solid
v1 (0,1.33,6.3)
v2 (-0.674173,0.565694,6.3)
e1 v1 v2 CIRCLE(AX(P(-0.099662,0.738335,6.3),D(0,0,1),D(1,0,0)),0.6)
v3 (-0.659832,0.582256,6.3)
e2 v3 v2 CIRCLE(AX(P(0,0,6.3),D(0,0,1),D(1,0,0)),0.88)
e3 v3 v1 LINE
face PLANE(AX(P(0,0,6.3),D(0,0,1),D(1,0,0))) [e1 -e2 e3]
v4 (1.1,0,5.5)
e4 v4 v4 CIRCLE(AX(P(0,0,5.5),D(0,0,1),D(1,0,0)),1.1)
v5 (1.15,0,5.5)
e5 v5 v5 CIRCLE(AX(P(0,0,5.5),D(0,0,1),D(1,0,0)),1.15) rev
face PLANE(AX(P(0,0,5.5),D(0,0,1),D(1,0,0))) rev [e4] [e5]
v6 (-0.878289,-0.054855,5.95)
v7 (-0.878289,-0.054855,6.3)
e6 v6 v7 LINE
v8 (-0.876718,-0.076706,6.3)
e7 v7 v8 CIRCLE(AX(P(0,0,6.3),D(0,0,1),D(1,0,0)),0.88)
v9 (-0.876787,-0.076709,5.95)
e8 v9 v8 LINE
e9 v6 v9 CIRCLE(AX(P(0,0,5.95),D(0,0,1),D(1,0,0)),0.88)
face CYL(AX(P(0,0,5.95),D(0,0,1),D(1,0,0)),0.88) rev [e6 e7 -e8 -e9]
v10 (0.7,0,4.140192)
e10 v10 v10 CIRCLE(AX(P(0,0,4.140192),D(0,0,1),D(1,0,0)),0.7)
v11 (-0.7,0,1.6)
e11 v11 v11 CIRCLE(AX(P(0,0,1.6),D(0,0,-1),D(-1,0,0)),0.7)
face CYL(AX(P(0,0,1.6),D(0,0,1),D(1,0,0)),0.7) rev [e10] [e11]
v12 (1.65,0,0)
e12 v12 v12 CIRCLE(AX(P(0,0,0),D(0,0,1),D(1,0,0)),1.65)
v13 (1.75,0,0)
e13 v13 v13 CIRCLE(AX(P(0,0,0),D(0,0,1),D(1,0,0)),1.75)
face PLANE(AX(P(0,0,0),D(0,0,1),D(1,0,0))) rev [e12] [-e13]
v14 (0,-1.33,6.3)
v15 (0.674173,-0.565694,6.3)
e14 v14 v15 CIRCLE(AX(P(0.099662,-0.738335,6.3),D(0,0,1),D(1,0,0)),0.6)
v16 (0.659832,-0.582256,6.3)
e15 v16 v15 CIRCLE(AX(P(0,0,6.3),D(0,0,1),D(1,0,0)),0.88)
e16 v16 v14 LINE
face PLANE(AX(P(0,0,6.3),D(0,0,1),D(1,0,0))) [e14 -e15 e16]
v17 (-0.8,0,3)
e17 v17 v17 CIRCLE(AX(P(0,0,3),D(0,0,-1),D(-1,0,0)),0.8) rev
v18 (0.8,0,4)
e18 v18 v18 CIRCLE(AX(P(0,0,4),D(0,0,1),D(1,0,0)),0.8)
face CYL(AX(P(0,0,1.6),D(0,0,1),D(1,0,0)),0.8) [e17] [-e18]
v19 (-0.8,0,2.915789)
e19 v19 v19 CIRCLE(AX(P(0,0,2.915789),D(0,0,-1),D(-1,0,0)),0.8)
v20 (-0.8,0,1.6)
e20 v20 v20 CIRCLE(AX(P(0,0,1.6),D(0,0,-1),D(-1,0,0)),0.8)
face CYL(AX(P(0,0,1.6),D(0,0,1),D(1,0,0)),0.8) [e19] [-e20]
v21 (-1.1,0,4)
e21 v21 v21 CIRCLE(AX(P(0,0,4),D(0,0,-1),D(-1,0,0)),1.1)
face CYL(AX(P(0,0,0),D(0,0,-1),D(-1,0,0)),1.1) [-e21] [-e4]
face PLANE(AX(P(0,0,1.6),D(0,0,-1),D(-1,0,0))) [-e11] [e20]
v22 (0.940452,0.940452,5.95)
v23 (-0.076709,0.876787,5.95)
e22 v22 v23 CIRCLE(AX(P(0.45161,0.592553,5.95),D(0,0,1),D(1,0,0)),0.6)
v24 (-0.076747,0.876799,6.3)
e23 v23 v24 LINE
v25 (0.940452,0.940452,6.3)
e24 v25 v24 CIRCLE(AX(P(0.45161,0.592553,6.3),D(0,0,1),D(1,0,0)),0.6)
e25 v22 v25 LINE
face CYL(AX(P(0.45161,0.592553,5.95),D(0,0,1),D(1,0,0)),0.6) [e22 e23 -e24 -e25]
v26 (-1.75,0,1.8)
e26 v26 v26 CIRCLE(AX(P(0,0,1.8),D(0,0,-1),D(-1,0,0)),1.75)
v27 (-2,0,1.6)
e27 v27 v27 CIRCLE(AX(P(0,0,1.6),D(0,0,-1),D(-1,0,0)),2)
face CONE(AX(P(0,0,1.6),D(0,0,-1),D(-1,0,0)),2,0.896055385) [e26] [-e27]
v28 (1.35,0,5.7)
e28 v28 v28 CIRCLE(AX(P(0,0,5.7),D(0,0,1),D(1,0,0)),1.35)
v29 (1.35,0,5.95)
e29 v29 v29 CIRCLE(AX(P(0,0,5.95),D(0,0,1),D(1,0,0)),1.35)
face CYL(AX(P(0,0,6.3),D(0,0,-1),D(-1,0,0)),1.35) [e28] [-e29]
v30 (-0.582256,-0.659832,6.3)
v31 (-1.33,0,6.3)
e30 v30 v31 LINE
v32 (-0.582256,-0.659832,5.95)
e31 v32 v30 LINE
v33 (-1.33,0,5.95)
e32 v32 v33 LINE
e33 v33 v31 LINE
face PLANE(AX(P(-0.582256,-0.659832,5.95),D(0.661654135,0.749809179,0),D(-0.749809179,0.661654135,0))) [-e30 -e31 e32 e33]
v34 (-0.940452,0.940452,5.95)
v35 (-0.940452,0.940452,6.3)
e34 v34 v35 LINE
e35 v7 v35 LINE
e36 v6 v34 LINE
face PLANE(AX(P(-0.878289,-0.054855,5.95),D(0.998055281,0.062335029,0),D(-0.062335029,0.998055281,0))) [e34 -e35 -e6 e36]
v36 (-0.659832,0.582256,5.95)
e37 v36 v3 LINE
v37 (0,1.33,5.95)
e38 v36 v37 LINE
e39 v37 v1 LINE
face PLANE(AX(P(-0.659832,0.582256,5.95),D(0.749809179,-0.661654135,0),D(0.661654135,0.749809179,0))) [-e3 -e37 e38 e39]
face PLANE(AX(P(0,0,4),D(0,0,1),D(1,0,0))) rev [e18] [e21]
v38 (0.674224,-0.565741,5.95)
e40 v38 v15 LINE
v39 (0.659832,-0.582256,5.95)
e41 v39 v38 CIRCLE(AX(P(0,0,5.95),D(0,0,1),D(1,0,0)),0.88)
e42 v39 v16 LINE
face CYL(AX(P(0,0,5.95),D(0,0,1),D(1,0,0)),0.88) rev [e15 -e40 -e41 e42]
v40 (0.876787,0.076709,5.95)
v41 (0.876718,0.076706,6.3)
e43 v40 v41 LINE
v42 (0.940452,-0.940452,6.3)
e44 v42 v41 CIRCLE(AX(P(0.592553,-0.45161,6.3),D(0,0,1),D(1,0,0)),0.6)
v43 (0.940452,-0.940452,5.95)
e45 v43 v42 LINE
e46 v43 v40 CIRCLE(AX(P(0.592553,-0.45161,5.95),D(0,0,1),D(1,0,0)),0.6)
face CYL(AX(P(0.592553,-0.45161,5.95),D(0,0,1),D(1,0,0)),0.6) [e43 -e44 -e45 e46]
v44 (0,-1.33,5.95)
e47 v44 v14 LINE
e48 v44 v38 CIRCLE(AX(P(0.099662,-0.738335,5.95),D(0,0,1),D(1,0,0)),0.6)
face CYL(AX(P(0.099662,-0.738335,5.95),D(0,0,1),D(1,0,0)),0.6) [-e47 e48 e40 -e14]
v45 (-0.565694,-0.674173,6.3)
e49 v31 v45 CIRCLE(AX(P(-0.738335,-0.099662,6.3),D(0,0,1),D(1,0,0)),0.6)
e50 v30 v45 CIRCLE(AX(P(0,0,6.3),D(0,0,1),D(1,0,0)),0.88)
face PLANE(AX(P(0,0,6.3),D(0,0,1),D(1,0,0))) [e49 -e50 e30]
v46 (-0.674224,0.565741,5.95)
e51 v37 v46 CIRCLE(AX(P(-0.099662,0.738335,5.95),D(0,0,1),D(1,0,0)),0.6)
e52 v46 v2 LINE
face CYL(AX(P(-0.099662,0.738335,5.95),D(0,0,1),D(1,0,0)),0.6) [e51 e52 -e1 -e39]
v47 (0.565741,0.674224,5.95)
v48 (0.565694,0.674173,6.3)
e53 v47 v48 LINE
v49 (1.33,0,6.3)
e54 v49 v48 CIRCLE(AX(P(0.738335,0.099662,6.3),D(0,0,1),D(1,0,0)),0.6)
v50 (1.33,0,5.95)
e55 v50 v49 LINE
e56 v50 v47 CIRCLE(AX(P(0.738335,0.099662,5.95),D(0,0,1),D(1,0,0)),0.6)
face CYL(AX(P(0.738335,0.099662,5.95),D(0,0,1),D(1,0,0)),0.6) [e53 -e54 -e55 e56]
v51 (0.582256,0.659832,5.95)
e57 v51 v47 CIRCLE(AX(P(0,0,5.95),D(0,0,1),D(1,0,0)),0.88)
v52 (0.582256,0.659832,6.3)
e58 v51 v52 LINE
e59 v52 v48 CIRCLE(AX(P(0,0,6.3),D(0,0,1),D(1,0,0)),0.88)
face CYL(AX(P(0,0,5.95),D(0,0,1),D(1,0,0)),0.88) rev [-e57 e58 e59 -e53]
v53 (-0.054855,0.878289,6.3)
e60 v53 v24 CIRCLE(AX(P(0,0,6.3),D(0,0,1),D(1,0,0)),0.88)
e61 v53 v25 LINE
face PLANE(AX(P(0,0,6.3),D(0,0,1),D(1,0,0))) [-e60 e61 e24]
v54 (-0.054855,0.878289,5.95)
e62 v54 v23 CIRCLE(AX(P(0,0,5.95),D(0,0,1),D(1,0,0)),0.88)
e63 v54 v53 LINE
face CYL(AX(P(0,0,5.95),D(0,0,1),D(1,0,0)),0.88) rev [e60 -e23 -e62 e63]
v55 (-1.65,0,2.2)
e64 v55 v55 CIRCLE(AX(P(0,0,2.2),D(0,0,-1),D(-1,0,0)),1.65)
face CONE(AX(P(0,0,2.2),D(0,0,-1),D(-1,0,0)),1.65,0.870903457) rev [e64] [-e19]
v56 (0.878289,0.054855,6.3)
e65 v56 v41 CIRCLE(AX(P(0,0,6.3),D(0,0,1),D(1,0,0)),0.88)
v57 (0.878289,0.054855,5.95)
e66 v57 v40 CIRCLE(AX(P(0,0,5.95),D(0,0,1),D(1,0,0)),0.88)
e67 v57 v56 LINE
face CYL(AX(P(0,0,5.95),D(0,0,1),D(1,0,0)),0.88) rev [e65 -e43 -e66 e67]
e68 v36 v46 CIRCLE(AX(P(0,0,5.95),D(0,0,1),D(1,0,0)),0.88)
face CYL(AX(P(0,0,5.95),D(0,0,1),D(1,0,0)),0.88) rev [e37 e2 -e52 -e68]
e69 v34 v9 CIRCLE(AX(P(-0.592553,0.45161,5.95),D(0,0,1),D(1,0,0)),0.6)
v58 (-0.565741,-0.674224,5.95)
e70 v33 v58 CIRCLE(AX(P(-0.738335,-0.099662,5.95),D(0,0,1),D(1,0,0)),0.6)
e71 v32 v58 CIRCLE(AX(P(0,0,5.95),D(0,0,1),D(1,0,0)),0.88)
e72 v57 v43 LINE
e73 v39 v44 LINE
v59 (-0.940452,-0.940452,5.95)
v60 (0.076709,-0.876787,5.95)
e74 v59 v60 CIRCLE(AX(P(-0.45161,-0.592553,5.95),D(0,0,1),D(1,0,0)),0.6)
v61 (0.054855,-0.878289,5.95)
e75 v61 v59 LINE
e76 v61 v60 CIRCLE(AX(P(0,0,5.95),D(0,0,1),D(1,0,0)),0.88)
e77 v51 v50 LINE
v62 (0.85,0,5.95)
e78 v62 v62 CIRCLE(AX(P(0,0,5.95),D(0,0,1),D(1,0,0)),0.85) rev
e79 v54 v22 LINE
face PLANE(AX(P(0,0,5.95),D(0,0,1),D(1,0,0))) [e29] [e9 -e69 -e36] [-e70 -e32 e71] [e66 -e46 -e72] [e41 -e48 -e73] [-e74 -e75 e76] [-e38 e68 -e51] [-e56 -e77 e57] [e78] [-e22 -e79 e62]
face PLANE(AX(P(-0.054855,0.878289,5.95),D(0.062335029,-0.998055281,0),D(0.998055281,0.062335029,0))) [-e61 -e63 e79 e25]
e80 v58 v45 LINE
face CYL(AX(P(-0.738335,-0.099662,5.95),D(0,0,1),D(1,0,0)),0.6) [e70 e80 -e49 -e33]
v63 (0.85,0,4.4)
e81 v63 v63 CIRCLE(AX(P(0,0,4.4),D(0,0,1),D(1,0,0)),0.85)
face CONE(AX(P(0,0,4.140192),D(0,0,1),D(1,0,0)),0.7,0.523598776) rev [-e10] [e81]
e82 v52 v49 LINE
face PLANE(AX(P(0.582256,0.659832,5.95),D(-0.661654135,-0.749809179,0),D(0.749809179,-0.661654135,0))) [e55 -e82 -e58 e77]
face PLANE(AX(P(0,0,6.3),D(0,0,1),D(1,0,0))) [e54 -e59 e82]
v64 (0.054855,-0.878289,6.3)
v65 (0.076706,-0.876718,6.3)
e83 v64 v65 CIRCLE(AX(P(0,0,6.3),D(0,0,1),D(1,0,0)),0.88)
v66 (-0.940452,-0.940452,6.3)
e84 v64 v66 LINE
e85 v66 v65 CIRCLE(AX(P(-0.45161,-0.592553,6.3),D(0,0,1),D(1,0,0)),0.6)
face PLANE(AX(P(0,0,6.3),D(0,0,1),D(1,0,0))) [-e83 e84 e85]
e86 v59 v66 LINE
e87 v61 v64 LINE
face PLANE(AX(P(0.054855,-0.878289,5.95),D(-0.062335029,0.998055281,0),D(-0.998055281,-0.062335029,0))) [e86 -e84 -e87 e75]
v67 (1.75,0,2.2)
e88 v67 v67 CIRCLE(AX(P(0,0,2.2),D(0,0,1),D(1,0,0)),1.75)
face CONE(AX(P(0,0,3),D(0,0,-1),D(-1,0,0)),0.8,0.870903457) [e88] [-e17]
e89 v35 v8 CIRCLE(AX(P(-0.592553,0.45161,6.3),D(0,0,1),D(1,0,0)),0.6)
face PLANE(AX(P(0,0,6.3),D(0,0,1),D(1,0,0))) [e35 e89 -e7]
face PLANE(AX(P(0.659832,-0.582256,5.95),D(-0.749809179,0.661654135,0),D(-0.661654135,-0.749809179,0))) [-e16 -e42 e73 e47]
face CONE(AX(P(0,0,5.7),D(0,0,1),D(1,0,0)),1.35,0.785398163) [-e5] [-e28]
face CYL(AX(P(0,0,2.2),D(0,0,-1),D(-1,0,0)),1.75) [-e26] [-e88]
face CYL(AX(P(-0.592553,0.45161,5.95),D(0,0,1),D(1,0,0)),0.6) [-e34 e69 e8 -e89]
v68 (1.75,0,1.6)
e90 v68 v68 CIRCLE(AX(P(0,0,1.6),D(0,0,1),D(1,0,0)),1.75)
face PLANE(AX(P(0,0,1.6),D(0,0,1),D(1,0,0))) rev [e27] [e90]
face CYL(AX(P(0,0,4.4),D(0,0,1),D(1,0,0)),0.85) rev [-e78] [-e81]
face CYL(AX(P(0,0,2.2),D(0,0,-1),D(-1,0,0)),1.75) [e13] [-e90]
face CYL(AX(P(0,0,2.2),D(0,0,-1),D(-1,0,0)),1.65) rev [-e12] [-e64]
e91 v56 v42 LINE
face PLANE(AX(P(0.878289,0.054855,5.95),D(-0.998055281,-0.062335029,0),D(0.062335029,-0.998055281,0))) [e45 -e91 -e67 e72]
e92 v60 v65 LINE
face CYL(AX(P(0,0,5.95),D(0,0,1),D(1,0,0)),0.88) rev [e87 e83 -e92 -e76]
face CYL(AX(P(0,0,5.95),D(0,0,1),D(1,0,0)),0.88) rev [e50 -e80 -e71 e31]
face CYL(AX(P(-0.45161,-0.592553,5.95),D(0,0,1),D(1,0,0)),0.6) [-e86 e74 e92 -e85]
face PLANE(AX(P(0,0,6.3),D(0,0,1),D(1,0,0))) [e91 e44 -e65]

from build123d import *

# Parameters (mm, degrees)
SKETCH_1_R          = 1.75
SKETCH_1_R_2        = 1.65
EXTRUDE_1_DEPTH     = 2.2
SKETCH_10_R         = 0.8
SKETCH_10_R_2       = 0.7
EXTRUDE_2_DEPTH     = 1.2
SKETCH_11_R         = 0.8
SKETCH_11_R_2       = 0.7
EXTRUDE_4_DEPTH     = 0.9
SKETCH_12_W         = 0.3
SKETCH_12_H         = 0.9
SKETCH_13_R         = 0.85
CUT_EXTRUDE_2_DEPTH = 0.5
CHAMFER_1_SIZE      = 0.15
CHAMFER_1_SIZE_2    = 0.259807621
SKETCH_14_R         = 1.1
SKETCH_14_R_2       = 0.85
EXTRUDE_5_DEPTH     = 0.6
SKETCH_15_R         = 1.35
SKETCH_15_R_2       = 1.1
EXTRUDE_6_DEPTH     = 0.8
SKETCH_17_R         = 1.1
SKETCH_17_R_2       = 0.85
EXTRUDE_7_DEPTH     = 0.8
CHAMFER_3_SIZE      = 0.2
CUT_EXTRUDE_START   = -0.35
SKETCH_20_R         = 1.35
SKETCH_20_R_2       = 0.85
CUT_EXTRUDE_4_DEPTH = 0.35


with BuildPart() as part:
    # 스케치1 → 보스-돌출1 (new body)
    with BuildSketch(Plane.XY):
        Circle(SKETCH_1_R)
        Circle(SKETCH_1_R_2, mode=Mode.SUBTRACT)
    extrude(amount=EXTRUDE_1_DEPTH)

    # 스케치2 → 회전1 (revolve)
    with BuildSketch(Plane(origin=(0, 0, 0), x_dir=(1, 0, 0), z_dir=(0, 1, 0)), mode=Mode.PRIVATE) as revolve_1_sk:
        Polygon((2, -1.6), (1.75, -1.8), (1.75, -1.6), align=None)
    revolve(revolve_1_sk.sketch.rotate(Axis((0, 0, 0), (0, 0, 1)), 180), axis=Axis((0, 0, 0), (0, 0, 1)))

    # 스케치3 → 회전2 (revolve)
    with BuildSketch(Plane(origin=(0, 0, 0), x_dir=(1, 0, 0), z_dir=(0, 1, 0)), mode=Mode.PRIVATE) as revolve_2_sk:
        Polygon((0.8, -3), (1.75, -2.2), (1.65, -2.2), (0.8, -2.915789474), align=None)
    revolve(revolve_2_sk.sketch.rotate(Axis((0, 0, 0), (0, 0, 1)), 180), axis=Axis((0, 0, 0), (0, 0, 1)))

    # 스케치10 → 보스-돌출2 (add, symmetric)
    with BuildSketch(Plane(origin=(0, 0, 2.8), x_dir=(-1, 0, 0), z_dir=(0, 0, -1))):
        Circle(SKETCH_10_R)
        Circle(SKETCH_10_R_2, mode=Mode.SUBTRACT)
    extrude(amount=EXTRUDE_2_DEPTH, both=True)

    # 스케치11 → 보스-돌출4 (add)
    with BuildSketch(Plane.XY.offset(4)):
        with Locations(Location((0, 0, 0), (0, 0, 180))):
            Circle(SKETCH_11_R)
        Circle(SKETCH_11_R_2, mode=Mode.SUBTRACT)
    extrude(amount=EXTRUDE_4_DEPTH)

    # 스케치12 → 회전3 (revolve)
    with BuildSketch(Plane(origin=(0, 0, 0), x_dir=(1, 0, 0), z_dir=(0, 1, 0)), mode=Mode.PRIVATE) as revolve_3_sk:
        with Locations((0.95, -4.45)):
            Rectangle(SKETCH_12_W, SKETCH_12_H)
    revolve(revolve_3_sk.sketch.rotate(Axis((0, 0, 0), (0, 0, 1)), 180), axis=Axis((0, 0, 0), (0, 0, 1)))

    # 스케치13 → 컷-돌출2 (cut)
    with BuildSketch(Plane.XY.offset(4.9)):
        Circle(SKETCH_13_R)
    extrude(amount=-CUT_EXTRUDE_2_DEPTH, mode=Mode.SUBTRACT)

    # 모따기1
    # the kernel refuses this chamfer: 0.259807621, 0.15 mm, written as the material it takes off along each edge
    with BuildSketch(Plane(origin=(0, 0, 4.4), x_dir=(1, 0, 0), z_dir=(0, 1, 0))) as chamfer_1_piece_1_section:
        Polygon((0.7 + CHAMFER_1_SIZE, 0), (0.7, CHAMFER_1_SIZE_2), (0.7, 0), align=None)
    chamfer_1_piece_1 = revolve(axis=Axis((0, 0, 4.4), (0, 0, -1)), mode=Mode.PRIVATE)
    chamfer_1_piece_1 = chamfer_1_piece_1 & Plane(origin=(0, 0, 4.267945413), x_dir=(1, 0, 0), z_dir=(0, 0, 1)) * Cylinder(0.85, 4, mode=Mode.PRIVATE)
    add(chamfer_1_piece_1, mode=Mode.SUBTRACT)

    # 스케치14 → 보스-돌출5 (add)
    with BuildSketch(Plane.XY.offset(4.9)):
        with Locations(Location((0, 0, 0), (0, 0, 180))):
            Circle(SKETCH_14_R)
        Circle(SKETCH_14_R_2, mode=Mode.SUBTRACT)
    extrude(amount=EXTRUDE_5_DEPTH)



with BuildPart() as body_2:
    # 스케치15 → 보스-돌출6 (new body)
    with BuildSketch(Plane.XY.offset(5.5)):
        Circle(SKETCH_15_R)
        with Locations(Location((0, 0, 0), (0, 0, 180))):
            Circle(SKETCH_15_R_2, mode=Mode.SUBTRACT)
    extrude(amount=EXTRUDE_6_DEPTH)


with BuildPart() as part_1:
    add(part.part)

    add(body_2.part)  # 보스-돌출7 merges body 2
    # 스케치17 → 보스-돌출7 (add)
    with BuildSketch(Plane.XY.offset(5.5)):
        with Locations(Location((0, 0, 0), (0, 0, 180))):
            Circle(SKETCH_17_R)
        Circle(SKETCH_17_R_2, mode=Mode.SUBTRACT)
    extrude(amount=EXTRUDE_7_DEPTH)

    # 모따기3
    chamfer_3_edges = [part_1.edges().sort_by_distance(p)[0] for p in [
        (-1.35, 0, 5.5),
    ]]
    chamfer(chamfer_3_edges, length=CHAMFER_3_SIZE)

    # 스케치20 → 컷-돌출4 (cut)
    with BuildSketch(Plane.XY.offset(6.3).offset(CUT_EXTRUDE_START)):
        Circle(SKETCH_20_R)
        Circle(SKETCH_20_R_2, mode=Mode.SUBTRACT)
        with BuildLine():
            Line((-0.940452019, -0.940452019), (0.076720819, -0.876922974))
            ThreePointArc((0.076720819, -0.876922974), (-0.414209233, -1.191386171), (-0.940452019, -0.940452019))
        make_face(mode=Mode.SUBTRACT)
        with BuildLine():
            Line((-1.33, 0), (-0.56582837, -0.674327993))
            ThreePointArc((-0.56582837, -0.674327993), (-1.135327398, -0.549547083), (-1.33, 0))
        make_face(mode=Mode.SUBTRACT)
        with BuildLine():
            Line((0, -1.33), (0.674327993, -0.56582837))
            ThreePointArc((0.674327993, -0.56582837), (0.549547083, -1.135327398), (0, -1.33))
        make_face(mode=Mode.SUBTRACT)
        with BuildLine():
            Line((0.940452019, -0.940452019), (0.876922974, 0.076720819))
            ThreePointArc((0.876922974, 0.076720819), (1.191386171, -0.414209233), (0.940452019, -0.940452019))
        make_face(mode=Mode.SUBTRACT)
        with BuildLine():
            Line((-0.940452019, 0.940452019), (-0.876922974, -0.076720819))
            ThreePointArc((-0.876922974, -0.076720819), (-1.191386171, 0.414209233), (-0.940452019, 0.940452019))
        make_face(mode=Mode.SUBTRACT)
        with BuildLine():
            ThreePointArc((-0.674327993, 0.56582837), (-0.549547083, 1.135327398), (0, 1.33))
            Line((0, 1.33), (-0.674327993, 0.56582837))
        make_face(mode=Mode.SUBTRACT)
        with BuildLine():
            Line((0.940452019, 0.940452019), (-0.076720819, 0.876922974))
            ThreePointArc((-0.076720819, 0.876922974), (0.414209233, 1.191386171), (0.940452019, 0.940452019))
        make_face(mode=Mode.SUBTRACT)
        with BuildLine():
            Line((1.33, 0), (0.56582837, 0.674327993))
            ThreePointArc((0.56582837, 0.674327993), (1.135327398, 0.549547083), (1.33, 0))
        make_face(mode=Mode.SUBTRACT)
    extrude(amount=CUT_EXTRUDE_4_DEPTH, mode=Mode.SUBTRACT)


solid = part_1.part
